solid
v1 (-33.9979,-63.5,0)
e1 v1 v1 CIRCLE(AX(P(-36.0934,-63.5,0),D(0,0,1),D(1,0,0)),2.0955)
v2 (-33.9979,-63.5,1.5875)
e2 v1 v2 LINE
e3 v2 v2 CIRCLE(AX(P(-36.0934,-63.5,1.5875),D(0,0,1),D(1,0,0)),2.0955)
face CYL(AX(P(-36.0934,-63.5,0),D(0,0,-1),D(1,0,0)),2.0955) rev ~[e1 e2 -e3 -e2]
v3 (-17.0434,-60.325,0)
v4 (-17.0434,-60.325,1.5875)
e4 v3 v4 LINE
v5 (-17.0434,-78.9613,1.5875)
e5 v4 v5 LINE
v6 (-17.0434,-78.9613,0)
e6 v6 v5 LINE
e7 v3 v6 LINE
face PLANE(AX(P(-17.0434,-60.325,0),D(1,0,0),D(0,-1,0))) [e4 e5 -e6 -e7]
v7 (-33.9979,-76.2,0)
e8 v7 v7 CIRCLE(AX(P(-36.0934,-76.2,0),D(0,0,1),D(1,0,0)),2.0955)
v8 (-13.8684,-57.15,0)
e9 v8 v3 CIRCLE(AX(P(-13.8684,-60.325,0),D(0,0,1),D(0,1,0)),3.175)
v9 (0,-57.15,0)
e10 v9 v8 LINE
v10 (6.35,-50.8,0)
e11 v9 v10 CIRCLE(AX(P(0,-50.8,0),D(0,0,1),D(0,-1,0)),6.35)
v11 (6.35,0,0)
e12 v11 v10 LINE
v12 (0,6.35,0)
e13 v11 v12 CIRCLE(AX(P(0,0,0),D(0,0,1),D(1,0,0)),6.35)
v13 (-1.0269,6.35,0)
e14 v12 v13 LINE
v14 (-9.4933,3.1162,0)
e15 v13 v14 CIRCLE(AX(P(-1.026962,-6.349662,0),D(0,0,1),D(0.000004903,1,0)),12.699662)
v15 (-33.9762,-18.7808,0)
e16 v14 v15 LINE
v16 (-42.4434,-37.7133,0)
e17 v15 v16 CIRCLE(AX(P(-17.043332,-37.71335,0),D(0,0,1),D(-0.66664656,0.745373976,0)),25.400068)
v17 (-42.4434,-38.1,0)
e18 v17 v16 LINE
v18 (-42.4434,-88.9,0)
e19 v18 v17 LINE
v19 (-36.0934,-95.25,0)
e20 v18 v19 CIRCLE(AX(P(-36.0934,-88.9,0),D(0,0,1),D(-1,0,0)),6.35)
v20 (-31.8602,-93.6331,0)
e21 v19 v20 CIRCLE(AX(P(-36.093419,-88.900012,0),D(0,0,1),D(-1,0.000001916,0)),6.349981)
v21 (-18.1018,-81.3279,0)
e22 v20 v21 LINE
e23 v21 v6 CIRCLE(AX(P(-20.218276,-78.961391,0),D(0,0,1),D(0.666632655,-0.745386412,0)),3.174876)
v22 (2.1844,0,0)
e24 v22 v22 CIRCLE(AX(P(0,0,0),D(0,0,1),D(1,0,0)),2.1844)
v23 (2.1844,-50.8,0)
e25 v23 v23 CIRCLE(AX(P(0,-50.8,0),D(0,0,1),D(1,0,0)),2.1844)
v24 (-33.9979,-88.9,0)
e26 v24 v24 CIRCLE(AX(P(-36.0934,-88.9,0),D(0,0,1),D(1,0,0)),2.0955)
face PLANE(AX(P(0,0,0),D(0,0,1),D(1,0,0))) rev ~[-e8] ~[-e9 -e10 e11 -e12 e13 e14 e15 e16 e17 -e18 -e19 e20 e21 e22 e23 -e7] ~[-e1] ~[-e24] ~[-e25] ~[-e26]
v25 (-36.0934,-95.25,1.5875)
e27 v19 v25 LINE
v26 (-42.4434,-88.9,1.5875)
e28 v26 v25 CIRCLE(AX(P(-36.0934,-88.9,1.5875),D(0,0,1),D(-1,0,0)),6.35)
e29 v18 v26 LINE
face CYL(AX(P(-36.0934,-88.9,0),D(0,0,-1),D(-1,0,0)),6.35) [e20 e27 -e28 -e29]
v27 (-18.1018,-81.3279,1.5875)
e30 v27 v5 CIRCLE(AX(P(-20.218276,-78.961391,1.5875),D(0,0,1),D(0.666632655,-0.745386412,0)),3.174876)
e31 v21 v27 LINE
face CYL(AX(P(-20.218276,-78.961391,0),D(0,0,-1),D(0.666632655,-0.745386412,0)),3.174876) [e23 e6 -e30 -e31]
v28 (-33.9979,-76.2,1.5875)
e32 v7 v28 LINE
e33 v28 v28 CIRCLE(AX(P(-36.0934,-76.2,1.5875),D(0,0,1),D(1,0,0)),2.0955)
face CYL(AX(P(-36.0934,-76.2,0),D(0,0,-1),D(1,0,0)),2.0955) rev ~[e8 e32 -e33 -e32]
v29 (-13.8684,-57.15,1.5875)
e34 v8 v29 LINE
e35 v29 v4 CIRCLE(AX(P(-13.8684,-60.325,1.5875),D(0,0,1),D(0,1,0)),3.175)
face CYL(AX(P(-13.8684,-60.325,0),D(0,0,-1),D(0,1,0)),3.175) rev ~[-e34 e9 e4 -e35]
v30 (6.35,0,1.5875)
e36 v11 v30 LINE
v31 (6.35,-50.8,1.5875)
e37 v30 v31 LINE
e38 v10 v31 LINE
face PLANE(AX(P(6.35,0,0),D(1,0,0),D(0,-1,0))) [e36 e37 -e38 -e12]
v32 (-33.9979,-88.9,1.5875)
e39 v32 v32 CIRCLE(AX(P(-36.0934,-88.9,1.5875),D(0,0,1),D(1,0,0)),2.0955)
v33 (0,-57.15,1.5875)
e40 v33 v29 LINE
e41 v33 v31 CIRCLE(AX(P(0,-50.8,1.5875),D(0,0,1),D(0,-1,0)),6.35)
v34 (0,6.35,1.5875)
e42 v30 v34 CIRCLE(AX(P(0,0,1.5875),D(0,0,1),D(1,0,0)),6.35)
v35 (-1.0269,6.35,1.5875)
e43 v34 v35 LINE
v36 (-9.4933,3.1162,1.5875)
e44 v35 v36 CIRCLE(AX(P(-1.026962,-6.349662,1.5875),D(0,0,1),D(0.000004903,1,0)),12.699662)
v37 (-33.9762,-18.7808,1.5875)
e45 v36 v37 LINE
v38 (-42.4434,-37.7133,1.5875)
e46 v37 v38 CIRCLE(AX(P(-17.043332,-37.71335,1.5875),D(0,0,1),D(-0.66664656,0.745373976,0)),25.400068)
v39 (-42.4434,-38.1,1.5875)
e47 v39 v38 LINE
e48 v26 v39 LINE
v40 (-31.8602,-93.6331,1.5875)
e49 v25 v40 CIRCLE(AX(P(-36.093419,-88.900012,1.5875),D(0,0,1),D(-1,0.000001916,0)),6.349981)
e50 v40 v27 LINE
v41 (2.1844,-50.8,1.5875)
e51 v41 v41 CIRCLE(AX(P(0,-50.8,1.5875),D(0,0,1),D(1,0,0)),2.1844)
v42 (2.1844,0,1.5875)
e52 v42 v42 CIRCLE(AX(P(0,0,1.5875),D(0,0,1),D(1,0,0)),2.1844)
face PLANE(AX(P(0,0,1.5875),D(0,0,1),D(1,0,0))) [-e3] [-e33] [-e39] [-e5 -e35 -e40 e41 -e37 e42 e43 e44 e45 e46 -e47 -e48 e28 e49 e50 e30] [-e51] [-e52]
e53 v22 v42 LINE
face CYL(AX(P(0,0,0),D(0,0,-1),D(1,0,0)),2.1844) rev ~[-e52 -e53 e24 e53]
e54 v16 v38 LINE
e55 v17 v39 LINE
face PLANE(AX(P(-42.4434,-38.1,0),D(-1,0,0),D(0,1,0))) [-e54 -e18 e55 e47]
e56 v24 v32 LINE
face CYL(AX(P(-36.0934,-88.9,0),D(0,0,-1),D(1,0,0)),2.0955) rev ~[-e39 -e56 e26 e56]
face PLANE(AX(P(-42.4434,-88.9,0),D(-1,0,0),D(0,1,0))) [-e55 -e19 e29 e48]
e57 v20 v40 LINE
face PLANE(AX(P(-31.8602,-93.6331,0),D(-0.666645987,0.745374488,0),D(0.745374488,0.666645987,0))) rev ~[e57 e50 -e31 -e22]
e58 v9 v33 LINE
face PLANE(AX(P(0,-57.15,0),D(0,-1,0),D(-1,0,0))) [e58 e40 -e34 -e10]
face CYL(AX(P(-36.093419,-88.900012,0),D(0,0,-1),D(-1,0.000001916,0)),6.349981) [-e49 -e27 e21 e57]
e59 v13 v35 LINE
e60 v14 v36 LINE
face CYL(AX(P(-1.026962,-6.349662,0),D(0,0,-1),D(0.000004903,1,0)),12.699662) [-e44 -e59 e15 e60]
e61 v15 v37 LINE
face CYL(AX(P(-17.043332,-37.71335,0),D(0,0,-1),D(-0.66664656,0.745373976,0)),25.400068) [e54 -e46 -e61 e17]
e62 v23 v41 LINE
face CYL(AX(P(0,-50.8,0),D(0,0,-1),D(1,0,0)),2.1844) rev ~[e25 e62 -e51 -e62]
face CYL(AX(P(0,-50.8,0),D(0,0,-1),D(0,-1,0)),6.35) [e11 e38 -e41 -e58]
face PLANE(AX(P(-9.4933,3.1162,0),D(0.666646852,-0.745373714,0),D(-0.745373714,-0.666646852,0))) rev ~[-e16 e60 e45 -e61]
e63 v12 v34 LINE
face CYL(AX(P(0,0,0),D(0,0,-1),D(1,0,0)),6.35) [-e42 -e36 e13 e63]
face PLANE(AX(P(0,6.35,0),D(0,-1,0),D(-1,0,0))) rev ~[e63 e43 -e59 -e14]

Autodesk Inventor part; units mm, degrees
ref_plane "YZ Plane" through (0, 0, 0) normal (1, 0, 0) x (0, 1, 0)
ref_plane "XZ Plane" through (0, 0, 0) normal (0, 1, 0) x (-1, 0, 0)
ref_plane "XY Plane" through (0, 0, 0) normal (0, 0, 1) x (1, 0, 0)
sketch "main" plane through (0, 0, 0) normal (0, 0, 1) x (1, 0, 0)
  line L0 (-27.3481, 7.6574) -> (-27.3481, 8.0441)
  circle A0 centre (-20.9981, -17.7426) radius 2.0955
  line L1 (-27.3481, -43.1426) -> (-27.3481, 8.0441)
  line L2 (-16.7649, -47.8757) -> (-3.0065, -35.5705)
  circle A1 centre (-20.9981, -43.1426) radius 2.0955
  arc A2 (-27.3481, -43.1426) -> (-20.9981, -49.4926) centre (-20.9981, -43.1426) ccw
  arc A3 (-27.3481, -43.1426) -> (-16.7649, -47.8757) centre (-20.9981, -43.1426) ccw
  arc A4 (21.4453, 45.7574) -> (15.0953, 52.1074) centre (15.0953, 45.7574) ccw
  arc A5 (-18.881, 26.9766) -> (-27.3481, 8.0441) centre (-1.9481, 8.0441) ccw
  line L3 (21.4453, 45.7574) -> (21.4453, -5.0426)
  line L4 (5.602, 48.8737) -> (-18.881, 26.9766)
  circle A6 centre (15.0953, 45.7574) radius 2.1844
  line L5 (15.0953, 52.1074) -> (14.0684, 52.1074)
  arc A7 (14.0684, 52.1074) -> (5.602, 48.8737) centre (14.0684, 39.4074) ccw
  circle A8 centre (15.0953, -5.0426) radius 2.1844
  arc A9 (15.0953, -11.3926) -> (21.4453, -5.0426) centre (15.0953, -5.0426) ccw
  line L6 (15.0953, -11.3926) -> (1.2269, -11.3926)
  line L7 (-1.9481, -14.5676) -> (-1.9481, -33.2039)
  arc A10 (1.2269, -11.3926) -> (-1.9481, -14.5676) centre (1.2269, -14.5676) ccw
  arc A11 (-3.0065, -35.5705) -> (-1.9481, -33.2039) centre (-5.1231, -33.2039) ccw
  point P0 (-2.0277, 1.4023)
  point P1 (-1.9481, -34.6239)
  point P2 (9.2176, 52.1074)
  dimension "d1" = 12.7
  dimension "d5" = 4.191
  dimension "d6" = 4.191
  dimension "d8" = 4.3688
  dimension "d9" = 3.175
  dimension "d10" = 25.4
sketch "Sketch1" plane through (0, 0, 0) normal (0, 0, 1) x (1, 0, 0)
  circle A0 centre (-36.0934, -76.2) radius 2.0955
  line L0 (-42.4434, -38.1) -> (-42.4434, -37.7133)
  circle A1 centre (-36.0934, -63.5) radius 2.0955
  line L1 (-42.4434, -88.9) -> (-42.4434, -37.7133)
  line L2 (-31.8602, -93.6331) -> (-18.1018, -81.3279)
  circle A2 centre (-36.0934, -88.9) radius 2.0955
  arc A3 (-42.4434, -88.9) -> (-36.0934, -95.25) centre (-36.0934, -88.9) ccw
  arc A4 (-42.4434, -88.9) -> (-31.8602, -93.6331) centre (-36.0934, -88.9) ccw
  arc A5 (6.35, 0) -> (0, 6.35) centre (0, 0) ccw
  arc A6 (-33.9762, -18.7808) -> (-42.4434, -37.7133) centre (-17.0434, -37.7133) ccw
  line L3 (6.35, 0) -> (6.35, -50.8)
  line L4 (-9.4933, 3.1162) -> (-33.9762, -18.7808)
  circle A7 centre (0, 0) radius 2.1844
  line L5 (0, 6.35) -> (-1.0269, 6.35)
  arc A8 (-1.0269, 6.35) -> (-9.4933, 3.1162) centre (-1.0269, -6.35) ccw
  circle A9 centre (0, -50.8) radius 2.1844
  arc A10 (0, -57.15) -> (6.35, -50.8) centre (0, -50.8) ccw
  line L6 (0, -57.15) -> (-13.8684, -57.15)
  line L7 (-17.0434, -60.325) -> (-17.0434, -78.9613)
  arc A11 (-13.8684, -57.15) -> (-17.0434, -60.325) centre (-13.8684, -60.325) ccw
  arc A12 (-18.1018, -81.3279) -> (-17.0434, -78.9613) centre (-20.2184, -78.9613) ccw
  point P0 (-42.4434, -38.1)
  dimension "d4" = 4.191
extrude "Extrusion1" add sketch "Sketch1" along normal blind 1.5875
properties part number "sled" material "Acetal Resin, White"
